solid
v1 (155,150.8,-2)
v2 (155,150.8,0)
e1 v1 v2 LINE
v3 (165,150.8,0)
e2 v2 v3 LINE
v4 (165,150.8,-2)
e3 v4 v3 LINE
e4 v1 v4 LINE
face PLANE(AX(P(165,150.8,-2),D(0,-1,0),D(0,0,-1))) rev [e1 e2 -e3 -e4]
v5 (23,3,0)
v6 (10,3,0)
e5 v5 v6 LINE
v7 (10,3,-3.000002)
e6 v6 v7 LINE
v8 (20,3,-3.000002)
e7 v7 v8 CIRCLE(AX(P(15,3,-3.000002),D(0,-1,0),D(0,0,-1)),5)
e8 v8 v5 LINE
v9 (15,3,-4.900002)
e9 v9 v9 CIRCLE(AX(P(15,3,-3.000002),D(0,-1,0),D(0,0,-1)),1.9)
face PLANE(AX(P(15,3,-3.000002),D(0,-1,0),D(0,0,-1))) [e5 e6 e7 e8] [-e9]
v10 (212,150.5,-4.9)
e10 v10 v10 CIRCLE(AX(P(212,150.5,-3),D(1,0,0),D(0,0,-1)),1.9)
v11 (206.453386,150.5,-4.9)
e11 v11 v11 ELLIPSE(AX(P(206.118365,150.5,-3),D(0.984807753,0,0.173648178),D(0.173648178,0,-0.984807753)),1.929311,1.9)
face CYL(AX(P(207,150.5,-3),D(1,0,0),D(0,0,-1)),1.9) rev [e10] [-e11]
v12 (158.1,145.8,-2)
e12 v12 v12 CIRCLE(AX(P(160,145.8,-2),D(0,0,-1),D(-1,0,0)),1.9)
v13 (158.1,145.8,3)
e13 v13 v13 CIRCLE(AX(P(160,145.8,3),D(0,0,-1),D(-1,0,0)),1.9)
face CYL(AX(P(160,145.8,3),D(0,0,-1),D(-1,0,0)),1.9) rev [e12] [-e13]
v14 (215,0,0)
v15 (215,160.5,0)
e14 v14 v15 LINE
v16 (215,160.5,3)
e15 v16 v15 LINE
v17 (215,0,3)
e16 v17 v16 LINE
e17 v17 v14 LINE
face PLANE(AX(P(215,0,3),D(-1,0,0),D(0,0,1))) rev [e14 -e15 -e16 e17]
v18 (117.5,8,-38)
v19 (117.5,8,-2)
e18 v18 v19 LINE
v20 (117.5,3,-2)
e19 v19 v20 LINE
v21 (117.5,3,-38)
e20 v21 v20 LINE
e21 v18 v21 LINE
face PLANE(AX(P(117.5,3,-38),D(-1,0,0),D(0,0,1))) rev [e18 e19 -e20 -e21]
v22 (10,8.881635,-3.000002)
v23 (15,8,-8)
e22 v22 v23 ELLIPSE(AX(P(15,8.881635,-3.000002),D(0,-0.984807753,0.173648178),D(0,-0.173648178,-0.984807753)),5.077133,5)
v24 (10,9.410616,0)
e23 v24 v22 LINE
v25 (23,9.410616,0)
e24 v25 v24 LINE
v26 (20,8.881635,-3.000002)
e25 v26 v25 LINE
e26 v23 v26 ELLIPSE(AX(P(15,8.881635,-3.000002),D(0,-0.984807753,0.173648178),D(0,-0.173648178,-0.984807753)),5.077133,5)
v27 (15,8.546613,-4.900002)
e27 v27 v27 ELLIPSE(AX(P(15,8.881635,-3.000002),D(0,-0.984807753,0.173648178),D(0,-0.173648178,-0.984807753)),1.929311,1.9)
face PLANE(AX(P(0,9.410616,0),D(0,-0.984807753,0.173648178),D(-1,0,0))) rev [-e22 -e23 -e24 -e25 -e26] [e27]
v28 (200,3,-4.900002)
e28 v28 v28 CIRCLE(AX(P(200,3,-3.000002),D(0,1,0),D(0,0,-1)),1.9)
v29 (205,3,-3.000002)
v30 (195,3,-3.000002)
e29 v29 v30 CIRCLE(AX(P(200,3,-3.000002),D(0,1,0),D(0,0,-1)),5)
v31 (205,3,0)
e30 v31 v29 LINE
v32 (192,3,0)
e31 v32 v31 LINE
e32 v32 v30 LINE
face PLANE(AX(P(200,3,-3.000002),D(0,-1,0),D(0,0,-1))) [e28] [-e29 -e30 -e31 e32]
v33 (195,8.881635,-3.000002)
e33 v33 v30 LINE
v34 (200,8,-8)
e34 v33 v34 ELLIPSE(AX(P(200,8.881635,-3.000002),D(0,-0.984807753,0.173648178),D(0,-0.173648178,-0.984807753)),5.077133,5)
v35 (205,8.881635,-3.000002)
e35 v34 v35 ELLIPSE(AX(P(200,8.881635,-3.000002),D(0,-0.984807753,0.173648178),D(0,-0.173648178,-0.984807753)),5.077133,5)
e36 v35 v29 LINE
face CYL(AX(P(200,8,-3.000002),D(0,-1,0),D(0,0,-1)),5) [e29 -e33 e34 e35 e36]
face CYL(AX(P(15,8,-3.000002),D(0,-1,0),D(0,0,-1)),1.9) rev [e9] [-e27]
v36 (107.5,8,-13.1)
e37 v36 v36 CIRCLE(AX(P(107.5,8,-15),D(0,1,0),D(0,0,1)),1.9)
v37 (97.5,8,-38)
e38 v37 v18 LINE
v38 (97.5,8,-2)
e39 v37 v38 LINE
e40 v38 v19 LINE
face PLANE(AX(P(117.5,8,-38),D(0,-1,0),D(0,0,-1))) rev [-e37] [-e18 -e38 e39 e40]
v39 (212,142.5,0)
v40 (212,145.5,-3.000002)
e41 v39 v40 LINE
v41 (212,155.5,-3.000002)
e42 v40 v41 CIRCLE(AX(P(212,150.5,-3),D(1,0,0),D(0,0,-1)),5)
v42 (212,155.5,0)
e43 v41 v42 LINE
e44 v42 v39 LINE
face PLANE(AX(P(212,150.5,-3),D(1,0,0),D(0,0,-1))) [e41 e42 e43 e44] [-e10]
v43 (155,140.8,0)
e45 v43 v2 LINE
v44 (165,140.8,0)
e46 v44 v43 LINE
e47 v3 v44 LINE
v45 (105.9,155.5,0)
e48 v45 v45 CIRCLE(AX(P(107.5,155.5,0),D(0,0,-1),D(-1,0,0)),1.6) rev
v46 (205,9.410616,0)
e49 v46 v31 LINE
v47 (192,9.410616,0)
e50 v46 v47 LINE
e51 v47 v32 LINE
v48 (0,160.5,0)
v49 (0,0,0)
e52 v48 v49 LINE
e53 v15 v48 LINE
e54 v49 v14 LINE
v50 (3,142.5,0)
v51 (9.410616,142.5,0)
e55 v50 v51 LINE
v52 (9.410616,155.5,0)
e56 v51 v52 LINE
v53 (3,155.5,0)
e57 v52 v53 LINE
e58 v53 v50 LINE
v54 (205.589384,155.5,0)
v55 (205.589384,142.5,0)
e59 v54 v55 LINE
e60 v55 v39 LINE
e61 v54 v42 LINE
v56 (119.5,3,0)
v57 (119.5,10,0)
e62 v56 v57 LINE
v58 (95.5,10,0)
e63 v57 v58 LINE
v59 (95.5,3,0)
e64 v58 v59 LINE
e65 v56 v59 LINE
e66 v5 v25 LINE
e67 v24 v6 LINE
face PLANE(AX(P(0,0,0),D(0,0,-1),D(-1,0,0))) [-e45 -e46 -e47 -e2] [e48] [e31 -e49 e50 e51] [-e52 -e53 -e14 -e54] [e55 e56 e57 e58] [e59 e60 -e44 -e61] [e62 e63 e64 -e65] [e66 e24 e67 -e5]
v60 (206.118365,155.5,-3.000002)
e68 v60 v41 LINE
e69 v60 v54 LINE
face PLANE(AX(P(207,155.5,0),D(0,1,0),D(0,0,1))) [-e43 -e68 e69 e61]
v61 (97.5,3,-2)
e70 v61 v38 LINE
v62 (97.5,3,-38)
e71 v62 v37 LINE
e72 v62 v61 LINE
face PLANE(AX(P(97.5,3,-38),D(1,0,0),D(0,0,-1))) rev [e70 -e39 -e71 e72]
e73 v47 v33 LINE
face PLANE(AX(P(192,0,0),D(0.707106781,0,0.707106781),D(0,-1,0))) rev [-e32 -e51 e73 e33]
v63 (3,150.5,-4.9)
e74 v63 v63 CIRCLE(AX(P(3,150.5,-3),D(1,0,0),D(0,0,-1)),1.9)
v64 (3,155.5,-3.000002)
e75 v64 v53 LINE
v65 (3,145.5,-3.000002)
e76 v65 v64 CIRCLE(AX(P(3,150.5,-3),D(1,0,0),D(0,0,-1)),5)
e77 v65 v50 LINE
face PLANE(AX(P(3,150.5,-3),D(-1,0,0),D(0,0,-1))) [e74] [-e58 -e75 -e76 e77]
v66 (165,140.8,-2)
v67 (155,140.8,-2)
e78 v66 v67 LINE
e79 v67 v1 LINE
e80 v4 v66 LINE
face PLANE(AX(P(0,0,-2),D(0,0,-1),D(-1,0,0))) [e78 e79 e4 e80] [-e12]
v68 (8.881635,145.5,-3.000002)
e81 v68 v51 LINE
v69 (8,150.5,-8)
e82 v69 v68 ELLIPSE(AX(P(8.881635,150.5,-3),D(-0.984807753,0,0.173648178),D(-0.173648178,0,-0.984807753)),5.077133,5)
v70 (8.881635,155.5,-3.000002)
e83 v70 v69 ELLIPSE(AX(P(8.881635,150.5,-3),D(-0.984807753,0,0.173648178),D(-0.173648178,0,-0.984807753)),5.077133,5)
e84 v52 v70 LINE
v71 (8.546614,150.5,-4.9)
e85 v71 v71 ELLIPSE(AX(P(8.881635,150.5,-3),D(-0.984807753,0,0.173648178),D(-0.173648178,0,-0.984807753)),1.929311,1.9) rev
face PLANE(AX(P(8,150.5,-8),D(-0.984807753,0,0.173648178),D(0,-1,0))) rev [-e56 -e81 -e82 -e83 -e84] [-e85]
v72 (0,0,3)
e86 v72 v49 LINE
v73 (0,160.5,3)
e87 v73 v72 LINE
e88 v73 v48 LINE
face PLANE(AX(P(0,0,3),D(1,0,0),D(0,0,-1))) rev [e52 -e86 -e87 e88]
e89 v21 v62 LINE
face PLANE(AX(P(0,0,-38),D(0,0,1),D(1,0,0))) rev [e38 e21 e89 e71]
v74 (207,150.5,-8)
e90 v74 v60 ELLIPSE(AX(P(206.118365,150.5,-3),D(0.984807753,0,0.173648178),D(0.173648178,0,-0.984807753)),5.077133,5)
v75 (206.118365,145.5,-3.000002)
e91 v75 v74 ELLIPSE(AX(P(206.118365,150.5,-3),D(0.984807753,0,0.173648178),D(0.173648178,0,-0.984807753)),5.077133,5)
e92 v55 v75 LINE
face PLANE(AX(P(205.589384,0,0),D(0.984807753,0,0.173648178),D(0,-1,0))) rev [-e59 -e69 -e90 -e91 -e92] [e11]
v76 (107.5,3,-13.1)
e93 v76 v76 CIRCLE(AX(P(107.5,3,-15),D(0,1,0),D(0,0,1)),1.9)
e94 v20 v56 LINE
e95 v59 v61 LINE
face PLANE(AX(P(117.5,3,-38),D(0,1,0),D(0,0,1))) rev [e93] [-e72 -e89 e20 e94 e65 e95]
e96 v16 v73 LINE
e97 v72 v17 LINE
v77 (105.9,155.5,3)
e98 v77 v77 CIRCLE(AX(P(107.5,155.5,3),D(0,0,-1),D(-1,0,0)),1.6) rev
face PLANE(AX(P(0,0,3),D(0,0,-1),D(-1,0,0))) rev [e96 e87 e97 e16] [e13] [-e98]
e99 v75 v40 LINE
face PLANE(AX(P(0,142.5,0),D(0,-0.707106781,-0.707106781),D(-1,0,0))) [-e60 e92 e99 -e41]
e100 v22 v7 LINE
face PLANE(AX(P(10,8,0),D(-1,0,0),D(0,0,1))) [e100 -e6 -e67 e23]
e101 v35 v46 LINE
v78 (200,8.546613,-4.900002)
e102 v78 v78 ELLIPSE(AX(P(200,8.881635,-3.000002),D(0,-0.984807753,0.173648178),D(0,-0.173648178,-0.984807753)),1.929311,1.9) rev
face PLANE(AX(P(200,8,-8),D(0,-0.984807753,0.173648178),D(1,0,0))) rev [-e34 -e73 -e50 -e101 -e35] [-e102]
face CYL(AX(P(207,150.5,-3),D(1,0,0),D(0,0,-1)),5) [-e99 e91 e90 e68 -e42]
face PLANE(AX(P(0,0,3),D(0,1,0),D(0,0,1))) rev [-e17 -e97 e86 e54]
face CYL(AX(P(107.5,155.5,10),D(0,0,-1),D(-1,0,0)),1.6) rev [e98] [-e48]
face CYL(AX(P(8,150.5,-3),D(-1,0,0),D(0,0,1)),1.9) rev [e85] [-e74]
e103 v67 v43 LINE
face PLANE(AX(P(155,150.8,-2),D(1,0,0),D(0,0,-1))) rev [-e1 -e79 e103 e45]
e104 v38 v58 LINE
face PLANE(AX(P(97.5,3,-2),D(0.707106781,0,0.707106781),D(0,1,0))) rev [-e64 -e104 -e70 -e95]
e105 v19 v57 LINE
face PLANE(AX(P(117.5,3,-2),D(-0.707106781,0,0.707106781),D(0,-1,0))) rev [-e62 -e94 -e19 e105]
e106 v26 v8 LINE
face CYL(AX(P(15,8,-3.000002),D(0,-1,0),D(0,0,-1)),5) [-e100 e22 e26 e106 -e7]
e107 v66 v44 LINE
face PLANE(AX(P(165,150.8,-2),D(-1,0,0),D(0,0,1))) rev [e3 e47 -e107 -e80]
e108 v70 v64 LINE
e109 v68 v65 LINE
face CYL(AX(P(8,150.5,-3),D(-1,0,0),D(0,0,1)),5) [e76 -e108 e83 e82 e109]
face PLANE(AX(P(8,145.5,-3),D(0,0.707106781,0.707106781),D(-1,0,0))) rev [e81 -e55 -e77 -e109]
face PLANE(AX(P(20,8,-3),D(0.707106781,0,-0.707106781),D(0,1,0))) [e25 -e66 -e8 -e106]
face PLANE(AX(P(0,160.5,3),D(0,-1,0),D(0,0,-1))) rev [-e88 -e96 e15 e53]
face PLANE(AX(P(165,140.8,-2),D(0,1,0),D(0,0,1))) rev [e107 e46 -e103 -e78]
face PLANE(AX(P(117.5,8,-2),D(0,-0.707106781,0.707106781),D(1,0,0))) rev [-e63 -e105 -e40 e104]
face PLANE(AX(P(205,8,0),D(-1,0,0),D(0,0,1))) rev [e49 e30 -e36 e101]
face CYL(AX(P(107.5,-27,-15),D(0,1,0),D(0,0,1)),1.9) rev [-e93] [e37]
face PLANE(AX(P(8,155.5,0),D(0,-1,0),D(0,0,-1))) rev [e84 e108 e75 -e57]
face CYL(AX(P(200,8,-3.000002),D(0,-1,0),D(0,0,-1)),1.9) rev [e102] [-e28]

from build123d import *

# Parameters (mm, degrees)
SZKIC1_W                    = 215
SZKIC1_H                    = 160.5
DODANIE_WYCI_GNI_CIE1_DEPTH = 3
DODANIE_WYCI_GNI_CIE2_START = -3
SZKIC2_R                    = 1.9
DODANIE_WYCI_GNI_CIE2_DEPTH = 5
DODANIE_WYCI_GNI_CIE3_START = -3
SZKIC3_R                    = 1.9
DODANIE_WYCI_GNI_CIE3_DEPTH = 5
SFAZOWANIE1_SIZE            = 3
SFAZOWANIE2_START           = 8
SFAZOWANIE2_OUTLINE_R       = 1.9
SFAZOWANIE2_DEPTH           = 1.410615846
SFAZOWANIE2_START_2         = 205.589384154
SFAZOWANIE2_2_OUTLINE_R     = 1.9
SFAZOWANIE2_2_DEPTH         = 1.410615846
SFAZOWANIE2_START_3         = 10
SFAZOWANIE2_3_DEPTH         = 13
SFAZOWANIE2_START_4         = 192
SFAZOWANIE2_4_DEPTH         = 13
SFAZOWANIE2_5_OUTLINE_R     = 1.9
SFAZOWANIE2_5_DEPTH         = 148
SZKIC4_R                    = 1.6
WYTNIJ_WYCI_GNI_CIE1_DEPTH  = 10
SZKIC5_W                    = 20
SZKIC5_H                    = 5
DODANIE_WYCI_GNI_CIE4_DEPTH = 38
SZKIC6_R                    = 1.9
WYTNIJ_WYCI_GNI_CIE2_DEPTH  = 35
SFAZOWANIE3_SIZE            = 2
SZKIC7_W                    = 10
SZKIC7_H                    = 10
DODANIE_WYCI_GNI_CIE5_DEPTH = 2
SZKIC8_R                    = 1.9
WYTNIJ_WYCI_GNI_CIE3_DEPTH  = 271.705097846


with BuildPart() as part:
    # Szkic1 → Dodanie-wyciągnięcie1 (new body)
    with BuildSketch(Plane.XY):
        with Locations((107.5, 80.25)):
            Rectangle(SZKIC1_W, SZKIC1_H)
    extrude(amount=DODANIE_WYCI_GNI_CIE1_DEPTH)

    # Szkic2 → Dodanie-wyciągnięcie2 (add)
    with BuildSketch(Plane(origin=(215, 0, 0), x_dir=(0, 0, -1), z_dir=(1, 0, 0)).offset(DODANIE_WYCI_GNI_CIE2_START)):
        with BuildLine():
            Line((0, 155.5), (3.000001535, 155.5))
            ThreePointArc((3.000001535, 155.5), (8, 150.5), (3.000001535, 145.5))
            Line((3.000001535, 145.5), (0, 145.5))
            Line((0, 145.5), (0, 155.5))
        make_face()
        with Locations((3, 150.5)):
            Circle(SZKIC2_R, mode=Mode.SUBTRACT)
    dodanie_wyci_gni_cie2 = extrude(amount=-DODANIE_WYCI_GNI_CIE2_DEPTH)

    # Lustro1: Dodanie-wyciągnięcie2 across plane
    add(dodanie_wyci_gni_cie2.mirror(Plane.ZY.offset(-107.5)))

    # Szkic3 → Dodanie-wyciągnięcie3 (add)
    with BuildSketch(Plane.XZ.offset(DODANIE_WYCI_GNI_CIE3_START)):
        with BuildLine():
            Line((10, 0), (20, 0))
            Line((20, 0), (20, -3.000001569))
            ThreePointArc((20, -3.000001569), (15, -8.000001569), (10, -3.000001569))
            Line((10, -3.000001569), (10, 0))
        make_face()
        with Locations(Location((15, -3.000001569, 0), (0, 0, 270))):
            Circle(SZKIC3_R, mode=Mode.SUBTRACT)
    dodanie_wyci_gni_cie3 = extrude(amount=-DODANIE_WYCI_GNI_CIE3_DEPTH)

    # Lustro2: Dodanie-wyciągnięcie3 across plane
    add(dodanie_wyci_gni_cie3.mirror(Plane.ZY.offset(-107.5)))

    # Sfazowanie1
    sfazowanie1_edges = [part.edges().sort_by_distance(p)[0] for p in [
        (195, 5.5, 0),
        (20, 5.5, 0),
        (5.5, 145.5, 0),
        (209.5, 145.5, 0),
    ]]
    chamfer(sfazowanie1_edges, length=SFAZOWANIE1_SIZE)

    # Sfazowanie2: read off the stored shape, not the designer's step
    # Sfazowanie2 outline → Sfazowanie2 (add)
    with BuildSketch(Plane.YZ.offset(SFAZOWANIE2_START)):
        with BuildLine():
            ThreePointArc((145.5, -3.000001489), (150.499999977, -8), (155.5, -3.000001535))
            Line((155.5, -3.000001535), (155.5, 0))
            Line((155.5, 0), (142.5, 0))
            Line((142.5, 0), (145.5, -3.000001489))
        make_face()
        with Locations((150.5, -3)):
            Circle(SFAZOWANIE2_OUTLINE_R, mode=Mode.SUBTRACT)
    extrude(amount=SFAZOWANIE2_DEPTH)

    # Sfazowanie2 2 outline → Sfazowanie2 2 (add)
    with BuildSketch(Plane.YZ.offset(SFAZOWANIE2_START_2)):
        with BuildLine():
            ThreePointArc((145.5, -3.000001489), (150.499999977, -8), (155.5, -3.000001535))
            Line((155.5, -3.000001535), (155.5, 0))
            Line((155.5, 0), (142.5, 0))
            Line((142.5, 0), (145.5, -3.000001489))
        make_face()
        with Locations((150.5, -3)):
            Circle(SFAZOWANIE2_2_OUTLINE_R, mode=Mode.SUBTRACT)
    extrude(amount=SFAZOWANIE2_2_DEPTH)

    # Sfazowanie2 3 outline → Sfazowanie2 3 (add)
    with BuildSketch(Plane.YZ.offset(SFAZOWANIE2_START_3)):
        Polygon((8, -8), (9.410615846, 0), (8, 0), align=None)
    extrude(amount=SFAZOWANIE2_3_DEPTH)

    # Sfazowanie2 4 outline → Sfazowanie2 4 (add)
    with BuildSketch(Plane.YZ.offset(SFAZOWANIE2_START_4)):
        Polygon((8, -8), (9.410615846, 0), (8, 0), align=None)
    extrude(amount=SFAZOWANIE2_4_DEPTH)

    # Sfazowanie2 5 outline → Sfazowanie2 5 (cut)
    with BuildSketch(Plane(origin=(0, 0, 0), x_dir=(1, 0, 0), z_dir=(0, 1, 0)).offset(SFAZOWANIE2_START)):
        with BuildLine():
            Line((10, 10), (10, 3.000001569))
            ThreePointArc((10, 3.000001569), (15.000000024, 8.000001569), (20, 3.000001521))
            Line((20, 3.000001521), (23, 0))
            Line((23, 0), (23, 10))
            Line((23, 10), (10, 10))
        make_face()
        Polygon((9.410615846, 0), (9.410615846, 10), (7.647346039, 10), (8, 8), align=None)
        with BuildLine():
            Line((205, 10), (192, 10))
            Line((192, 10), (192, 0))
            Line((192, 0), (195, 3.000001521))
            ThreePointArc((195, 3.000001521), (199.999999976, 8.000001569), (205, 3.000001569))
            Line((205, 3.000001569), (205, 10))
        make_face()
        Polygon((207.352653962, 10), (205.589384154, 10), (205.589384154, 0), (207, 8), align=None)
        with Locations((15, 3.000001569)):
            Circle(SFAZOWANIE2_5_OUTLINE_R)
        with Locations((200, 3.000001569)):
            Circle(SFAZOWANIE2_5_OUTLINE_R)
    extrude(amount=SFAZOWANIE2_5_DEPTH, mode=Mode.SUBTRACT)

    # Szkic4 → Wytnij-wyciągnięcie1 (cut)
    with BuildSketch(Plane(origin=(0, 0, 0), x_dir=(-1, 0, 0), z_dir=(0, 0, -1))):
        with Locations((-107.5, 155.5)):
            Circle(SZKIC4_R)
    extrude(amount=-WYTNIJ_WYCI_GNI_CIE1_DEPTH, mode=Mode.SUBTRACT)

    # Szkic5 → Dodanie-wyciągnięcie4 (add)
    with BuildSketch(Plane(origin=(0, 0, 0), x_dir=(-1, 0, 0), z_dir=(0, 0, -1))):
        with Locations((-107.5, 5.5)):
            Rectangle(SZKIC5_W, SZKIC5_H)
    extrude(amount=DODANIE_WYCI_GNI_CIE4_DEPTH)

    # Szkic6 → Wytnij-wyciągnięcie2 (cut)
    with BuildSketch(Plane(origin=(0, 8, 0), x_dir=(1, 0, 0), z_dir=(0, 1, 0))):
        with Locations(Location((107.5, 15, 0), (0, 0, 270))):
            Circle(SZKIC6_R)
    extrude(amount=-WYTNIJ_WYCI_GNI_CIE2_DEPTH, mode=Mode.SUBTRACT)

    # Sfazowanie3
    sfazowanie3_edges = [part.edges().sort_by_distance(p)[0] for p in [
        (117.5, 5.5, 0),
        (97.5, 5.5, 0),
        (107.5, 8, 0),
    ]]
    chamfer(sfazowanie3_edges, length=SFAZOWANIE3_SIZE)

    # Szkic7 → Dodanie-wyciągnięcie5 (add)
    with BuildSketch(Plane(origin=(0, 0, 0), x_dir=(-1, 0, 0), z_dir=(0, 0, -1))):
        with Locations((-160, 145.8)):
            Rectangle(SZKIC7_W, SZKIC7_H)
    extrude(amount=DODANIE_WYCI_GNI_CIE5_DEPTH)

    # Szkic8 → Wytnij-wyciągnięcie3 (cut, through all)
    with BuildSketch(Plane(origin=(0, 0, -2), x_dir=(-1, 0, 0), z_dir=(0, 0, -1))):
        with Locations((-160, 145.8)):
            Circle(SZKIC8_R)
    extrude(amount=-WYTNIJ_WYCI_GNI_CIE3_DEPTH, mode=Mode.SUBTRACT)


solid = part.part
